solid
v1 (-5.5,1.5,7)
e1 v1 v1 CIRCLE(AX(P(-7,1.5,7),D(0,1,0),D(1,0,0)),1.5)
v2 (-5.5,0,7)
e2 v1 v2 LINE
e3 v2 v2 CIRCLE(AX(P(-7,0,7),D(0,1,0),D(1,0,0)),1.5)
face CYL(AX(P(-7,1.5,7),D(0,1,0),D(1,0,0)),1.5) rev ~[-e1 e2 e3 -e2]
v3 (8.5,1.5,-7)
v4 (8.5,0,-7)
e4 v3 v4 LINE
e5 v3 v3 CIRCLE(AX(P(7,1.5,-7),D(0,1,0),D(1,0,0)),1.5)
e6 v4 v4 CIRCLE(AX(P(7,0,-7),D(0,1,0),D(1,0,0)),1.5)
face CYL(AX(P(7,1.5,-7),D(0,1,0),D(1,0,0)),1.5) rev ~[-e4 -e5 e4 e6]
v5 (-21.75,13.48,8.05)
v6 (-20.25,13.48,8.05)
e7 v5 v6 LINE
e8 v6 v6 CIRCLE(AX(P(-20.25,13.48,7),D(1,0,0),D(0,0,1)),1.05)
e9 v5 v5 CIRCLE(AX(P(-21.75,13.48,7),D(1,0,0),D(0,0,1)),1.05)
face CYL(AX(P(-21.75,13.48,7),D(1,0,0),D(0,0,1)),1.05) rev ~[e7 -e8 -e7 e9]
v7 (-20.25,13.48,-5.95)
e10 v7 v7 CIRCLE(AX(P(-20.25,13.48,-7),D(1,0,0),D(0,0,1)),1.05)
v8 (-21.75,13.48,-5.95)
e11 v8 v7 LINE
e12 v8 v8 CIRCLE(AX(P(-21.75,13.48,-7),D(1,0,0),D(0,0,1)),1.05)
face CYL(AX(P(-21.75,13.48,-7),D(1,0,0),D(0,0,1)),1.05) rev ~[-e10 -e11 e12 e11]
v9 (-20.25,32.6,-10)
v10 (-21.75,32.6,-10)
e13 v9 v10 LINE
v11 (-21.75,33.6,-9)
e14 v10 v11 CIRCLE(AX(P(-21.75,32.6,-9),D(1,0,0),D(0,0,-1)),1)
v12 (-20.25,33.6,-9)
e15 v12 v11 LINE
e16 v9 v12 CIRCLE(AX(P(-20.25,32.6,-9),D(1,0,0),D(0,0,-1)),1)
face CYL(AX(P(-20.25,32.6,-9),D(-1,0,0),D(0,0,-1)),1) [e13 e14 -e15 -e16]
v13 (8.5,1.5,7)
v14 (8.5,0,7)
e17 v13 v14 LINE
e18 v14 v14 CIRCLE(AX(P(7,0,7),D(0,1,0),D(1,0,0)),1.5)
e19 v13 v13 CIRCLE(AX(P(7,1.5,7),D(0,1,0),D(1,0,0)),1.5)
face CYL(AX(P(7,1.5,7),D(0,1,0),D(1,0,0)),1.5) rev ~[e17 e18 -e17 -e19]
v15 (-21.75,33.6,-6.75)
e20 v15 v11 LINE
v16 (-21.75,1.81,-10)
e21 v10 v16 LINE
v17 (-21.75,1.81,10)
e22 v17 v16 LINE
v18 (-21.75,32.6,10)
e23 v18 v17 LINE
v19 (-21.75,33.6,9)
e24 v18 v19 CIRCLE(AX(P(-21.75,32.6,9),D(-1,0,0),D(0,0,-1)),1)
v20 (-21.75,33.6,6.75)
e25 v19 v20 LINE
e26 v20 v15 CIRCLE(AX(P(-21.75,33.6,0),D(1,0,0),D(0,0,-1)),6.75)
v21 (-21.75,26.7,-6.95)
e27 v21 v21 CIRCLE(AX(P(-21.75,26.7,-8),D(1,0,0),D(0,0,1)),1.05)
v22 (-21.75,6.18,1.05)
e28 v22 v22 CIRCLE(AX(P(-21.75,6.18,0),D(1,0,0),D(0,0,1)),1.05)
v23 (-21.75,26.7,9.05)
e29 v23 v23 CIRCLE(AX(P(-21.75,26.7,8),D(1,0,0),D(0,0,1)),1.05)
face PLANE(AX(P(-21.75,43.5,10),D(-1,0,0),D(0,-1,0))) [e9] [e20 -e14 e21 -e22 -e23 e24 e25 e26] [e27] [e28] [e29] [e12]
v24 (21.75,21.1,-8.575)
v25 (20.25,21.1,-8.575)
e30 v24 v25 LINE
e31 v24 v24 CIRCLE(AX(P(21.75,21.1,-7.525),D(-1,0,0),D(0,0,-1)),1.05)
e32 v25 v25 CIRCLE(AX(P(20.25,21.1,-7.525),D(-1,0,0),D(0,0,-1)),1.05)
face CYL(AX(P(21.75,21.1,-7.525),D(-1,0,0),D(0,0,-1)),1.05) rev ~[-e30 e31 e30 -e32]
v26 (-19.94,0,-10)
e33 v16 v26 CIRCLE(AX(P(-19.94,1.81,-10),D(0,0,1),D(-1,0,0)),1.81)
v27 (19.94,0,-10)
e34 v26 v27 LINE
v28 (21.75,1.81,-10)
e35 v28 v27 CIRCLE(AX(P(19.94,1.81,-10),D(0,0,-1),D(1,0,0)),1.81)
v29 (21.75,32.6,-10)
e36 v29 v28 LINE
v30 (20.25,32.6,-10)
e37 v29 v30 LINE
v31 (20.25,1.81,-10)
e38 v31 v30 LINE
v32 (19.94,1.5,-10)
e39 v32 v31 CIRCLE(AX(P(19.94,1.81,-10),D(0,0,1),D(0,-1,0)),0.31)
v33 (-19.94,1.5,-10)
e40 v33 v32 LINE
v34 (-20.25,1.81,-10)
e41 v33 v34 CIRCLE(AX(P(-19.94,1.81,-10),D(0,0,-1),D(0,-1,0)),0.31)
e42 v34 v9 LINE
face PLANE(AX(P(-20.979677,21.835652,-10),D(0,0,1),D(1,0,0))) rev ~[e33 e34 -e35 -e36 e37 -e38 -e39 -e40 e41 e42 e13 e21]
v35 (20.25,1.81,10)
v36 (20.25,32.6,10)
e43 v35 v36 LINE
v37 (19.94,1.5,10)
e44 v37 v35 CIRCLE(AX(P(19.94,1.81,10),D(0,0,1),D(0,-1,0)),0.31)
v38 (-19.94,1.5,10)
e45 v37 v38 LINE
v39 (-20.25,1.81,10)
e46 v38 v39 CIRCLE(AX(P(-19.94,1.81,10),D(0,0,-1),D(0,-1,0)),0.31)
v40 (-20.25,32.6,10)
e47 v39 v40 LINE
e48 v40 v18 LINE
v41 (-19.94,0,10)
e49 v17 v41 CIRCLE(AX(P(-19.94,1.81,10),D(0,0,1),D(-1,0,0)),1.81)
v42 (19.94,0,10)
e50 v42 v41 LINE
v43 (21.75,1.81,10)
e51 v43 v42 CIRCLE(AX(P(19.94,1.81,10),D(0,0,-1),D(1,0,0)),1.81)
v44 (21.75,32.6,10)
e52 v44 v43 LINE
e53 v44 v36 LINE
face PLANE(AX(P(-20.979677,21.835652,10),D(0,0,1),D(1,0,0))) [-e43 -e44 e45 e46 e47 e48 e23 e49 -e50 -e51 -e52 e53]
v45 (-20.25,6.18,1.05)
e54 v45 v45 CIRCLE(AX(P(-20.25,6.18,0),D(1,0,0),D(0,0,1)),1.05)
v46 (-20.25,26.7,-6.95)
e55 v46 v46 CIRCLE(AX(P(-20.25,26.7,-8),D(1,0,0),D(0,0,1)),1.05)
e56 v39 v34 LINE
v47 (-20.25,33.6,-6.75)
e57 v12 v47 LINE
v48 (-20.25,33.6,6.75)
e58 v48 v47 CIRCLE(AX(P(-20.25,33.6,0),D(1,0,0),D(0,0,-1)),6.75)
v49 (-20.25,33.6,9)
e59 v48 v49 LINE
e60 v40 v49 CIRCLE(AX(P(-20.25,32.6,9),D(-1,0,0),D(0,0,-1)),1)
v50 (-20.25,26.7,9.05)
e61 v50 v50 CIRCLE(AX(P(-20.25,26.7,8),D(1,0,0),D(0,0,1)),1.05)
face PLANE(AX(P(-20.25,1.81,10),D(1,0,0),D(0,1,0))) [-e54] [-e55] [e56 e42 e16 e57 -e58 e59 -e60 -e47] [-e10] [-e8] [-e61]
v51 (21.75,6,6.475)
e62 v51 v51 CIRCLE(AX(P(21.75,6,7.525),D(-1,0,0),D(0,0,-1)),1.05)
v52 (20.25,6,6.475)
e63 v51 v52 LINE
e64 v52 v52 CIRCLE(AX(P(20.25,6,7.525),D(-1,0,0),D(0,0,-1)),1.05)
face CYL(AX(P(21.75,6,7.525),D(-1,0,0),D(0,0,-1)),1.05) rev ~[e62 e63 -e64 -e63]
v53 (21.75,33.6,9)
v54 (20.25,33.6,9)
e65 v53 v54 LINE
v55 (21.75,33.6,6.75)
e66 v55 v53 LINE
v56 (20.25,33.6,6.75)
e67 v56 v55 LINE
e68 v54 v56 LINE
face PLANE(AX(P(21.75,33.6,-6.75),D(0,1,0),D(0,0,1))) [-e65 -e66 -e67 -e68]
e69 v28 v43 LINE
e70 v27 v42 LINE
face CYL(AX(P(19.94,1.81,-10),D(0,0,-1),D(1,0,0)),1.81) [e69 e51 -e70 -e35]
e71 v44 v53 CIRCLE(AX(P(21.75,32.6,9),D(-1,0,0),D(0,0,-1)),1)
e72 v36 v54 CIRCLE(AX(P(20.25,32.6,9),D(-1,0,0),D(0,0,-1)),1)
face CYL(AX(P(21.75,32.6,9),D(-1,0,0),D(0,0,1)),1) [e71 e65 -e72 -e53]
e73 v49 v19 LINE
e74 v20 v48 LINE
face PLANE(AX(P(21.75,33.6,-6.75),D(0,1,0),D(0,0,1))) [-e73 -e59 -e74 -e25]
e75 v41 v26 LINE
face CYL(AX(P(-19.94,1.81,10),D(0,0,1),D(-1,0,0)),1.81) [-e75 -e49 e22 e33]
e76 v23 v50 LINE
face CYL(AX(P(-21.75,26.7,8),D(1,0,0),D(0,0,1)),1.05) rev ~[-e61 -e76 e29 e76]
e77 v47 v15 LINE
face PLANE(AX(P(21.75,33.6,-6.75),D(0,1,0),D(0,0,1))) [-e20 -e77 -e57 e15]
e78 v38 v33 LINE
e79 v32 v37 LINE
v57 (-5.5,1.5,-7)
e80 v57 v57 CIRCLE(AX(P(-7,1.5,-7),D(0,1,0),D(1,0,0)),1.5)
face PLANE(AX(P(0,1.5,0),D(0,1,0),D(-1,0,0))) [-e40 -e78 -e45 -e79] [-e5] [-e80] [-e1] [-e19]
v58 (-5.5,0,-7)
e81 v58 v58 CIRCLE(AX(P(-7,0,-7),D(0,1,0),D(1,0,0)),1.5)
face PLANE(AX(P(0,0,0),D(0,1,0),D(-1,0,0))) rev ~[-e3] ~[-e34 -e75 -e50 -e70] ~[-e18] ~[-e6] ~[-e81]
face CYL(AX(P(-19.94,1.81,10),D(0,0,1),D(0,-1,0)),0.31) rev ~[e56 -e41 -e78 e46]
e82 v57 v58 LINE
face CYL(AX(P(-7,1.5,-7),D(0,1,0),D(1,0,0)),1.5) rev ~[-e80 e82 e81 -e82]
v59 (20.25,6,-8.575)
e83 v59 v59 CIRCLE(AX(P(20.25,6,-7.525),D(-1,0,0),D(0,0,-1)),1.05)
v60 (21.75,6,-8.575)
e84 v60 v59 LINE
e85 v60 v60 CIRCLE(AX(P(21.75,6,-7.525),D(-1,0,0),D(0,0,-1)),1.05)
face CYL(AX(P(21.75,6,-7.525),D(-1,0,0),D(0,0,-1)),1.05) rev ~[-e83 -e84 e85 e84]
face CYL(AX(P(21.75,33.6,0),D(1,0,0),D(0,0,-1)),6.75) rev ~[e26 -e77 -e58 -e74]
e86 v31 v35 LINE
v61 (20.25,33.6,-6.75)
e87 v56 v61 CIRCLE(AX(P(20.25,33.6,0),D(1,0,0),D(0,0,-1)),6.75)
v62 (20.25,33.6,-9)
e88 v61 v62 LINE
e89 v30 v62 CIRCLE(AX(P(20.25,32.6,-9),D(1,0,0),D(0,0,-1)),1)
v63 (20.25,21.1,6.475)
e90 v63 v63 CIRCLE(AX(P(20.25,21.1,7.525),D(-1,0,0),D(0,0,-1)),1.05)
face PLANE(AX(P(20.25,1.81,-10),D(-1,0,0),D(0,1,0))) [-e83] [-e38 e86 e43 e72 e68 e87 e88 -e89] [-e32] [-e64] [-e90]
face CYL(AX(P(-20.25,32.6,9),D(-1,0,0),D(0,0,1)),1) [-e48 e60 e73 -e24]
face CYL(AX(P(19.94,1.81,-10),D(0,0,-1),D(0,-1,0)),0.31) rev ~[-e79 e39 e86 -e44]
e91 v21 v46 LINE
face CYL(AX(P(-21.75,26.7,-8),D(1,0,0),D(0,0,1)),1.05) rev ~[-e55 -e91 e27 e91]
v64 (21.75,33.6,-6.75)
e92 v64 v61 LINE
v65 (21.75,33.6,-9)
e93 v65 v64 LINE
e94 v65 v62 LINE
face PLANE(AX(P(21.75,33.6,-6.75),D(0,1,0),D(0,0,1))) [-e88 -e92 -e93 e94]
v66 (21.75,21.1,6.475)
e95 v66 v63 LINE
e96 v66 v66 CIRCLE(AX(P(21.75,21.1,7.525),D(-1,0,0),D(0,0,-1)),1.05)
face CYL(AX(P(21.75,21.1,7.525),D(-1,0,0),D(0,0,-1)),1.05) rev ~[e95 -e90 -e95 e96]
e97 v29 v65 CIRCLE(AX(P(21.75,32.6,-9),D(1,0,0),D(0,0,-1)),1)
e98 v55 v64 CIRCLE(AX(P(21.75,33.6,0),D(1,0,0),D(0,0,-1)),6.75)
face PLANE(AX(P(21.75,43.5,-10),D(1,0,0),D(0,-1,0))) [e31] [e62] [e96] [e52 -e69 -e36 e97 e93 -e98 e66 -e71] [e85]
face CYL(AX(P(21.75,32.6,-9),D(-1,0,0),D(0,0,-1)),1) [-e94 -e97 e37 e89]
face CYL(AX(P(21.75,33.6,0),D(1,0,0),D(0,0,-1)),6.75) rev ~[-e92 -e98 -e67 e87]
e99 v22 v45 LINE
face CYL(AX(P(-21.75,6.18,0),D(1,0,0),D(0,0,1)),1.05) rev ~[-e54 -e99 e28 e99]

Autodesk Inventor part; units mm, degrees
ref_plane "YZ Plane" through (0, 0, 0) normal (1, 0, 0) x (0, 1, 0)
ref_plane "XZ Plane" through (0, 0, 0) normal (0, 1, 0) x (-1, 0, 0)
ref_plane "XY Plane" through (0, 0, 0) normal (0, 0, 1) x (1, 0, 0)
sketch "Sketch1" plane through (0, 0, 0) normal (0, 1, 0) x (-1, 0, 0)
  line L0 (20.25, -10) -> (-20.25, -10)
  line L1 (-20.25, -10) -> (-20.25, 10)
  line L2 (-20.25, 10) -> (20.25, 10)
  line L3 (20.25, 10) -> (20.25, -10)
  point P0 (0, 0)
  dimension "d0" = 40.5
  dimension "d1" = 20
  dimension "d2" = 10
  dimension "d3" = 20.25
extrude "Plate1" add sketch "Sketch1" along normal blind 1.5
sketch "Sketch2" plane through (21.75, 0, -10) normal (-1, 0, 0) x (0, -1, 0)
  line L0 (0, 20) -> (0, 0)
  line L1 (0, 0) -> (-43.5, 0)
  line L2 (-43.5, 0) -> (-43.5, 20)
  line L3 (-43.5, 20) -> (0, 20)
edge flange "Flange1" height 43.5 angle 90 thickness 1.5 bend radius 0.31 thickness toward (-1, 0, 0) relief tear relief width 1.5 relief depth 0.75 edges at (20.25, 1.5, 0) wall of the first edge with corners at (21.75, 0, 10) (21.75, 0, -10) (21.75, 43.5, -10) (21.75, 43.5, 10)
bend "Bend1"
corner "Corner1"
sketch "Sketch3" plane through (-21.75, 0, 10) normal (1, 0, 0) x (0, 1, 0)
  line L0 (0, -20) -> (0, 0)
  line L1 (0, 0) -> (43.5, 0)
  line L2 (43.5, 0) -> (43.5, -20)
  line L3 (43.5, -20) -> (0, -20)
edge flange "Flange2" height 43.5 angle 90 thickness 1.5 bend radius 0.31 thickness toward (1, 0, 0) relief tear relief width 1.5 relief depth 0.75 edges at (-20.25, 1.5, 0) wall of the first edge with corners at (-21.75, 0, -10) (-21.75, 0, 10) (-21.75, 43.5, 10) (-21.75, 43.5, -10)
bend "Bend2"
corner "Corner2"
sketch "Sketch4" plane through (21.75, 43.5, 10) normal (1, 0, 0) x (0, 0, -1)
  circle A0 centre (10, -9.9) radius 6.75
  line L0 (0, 0) -> (20, 0) projected
  line L1 (20, 0) -> (20, -41.69) projected
  point P0 (10, -43.5)
  dimension "d25" = 9.9
  dimension "d26" = 13.5
  dimension "d27" = 10
extrude "Extrusion1" cut sketch "Sketch4" against normal blind 50
sketch "Sketch5" plane through (21.75, 43.5, 10) normal (1, 0, 0) x (0, 0, -1)
  circle A0 centre (10, -9.9) radius 6.75 projected
  line L0 (0, 0) -> (20, 0) projected
  line L1 (-4, 0) -> (24, 0)
  line L2 (24, 0) -> (24, -9.9)
  line L3 (24, -9.9) -> (-4, -9.9)
  line L4 (-4, -9.9) -> (-4, 0)
  line L5 (0, -41.69) -> (0, 0) projected
  point P0 (10, -43.5)
  point P1 (20, 0)
  dimension "d30" = 9.9
  dimension "d31" = 28
  dimension "d32" = 4
extrude "Extrusion2" cut sketch "Sketch5" against normal blind 50 contours L3 A0 | A0 L3 L5 L0 L1 L2 | L3 L4 L1 L5 picked at (11.6841, -8.408)
fillet "Fillet1" radius 1 4 edges at (-21, 33.6, 10) (-21, 33.6, -10) (21, 33.6, -10) (21, 33.6, 10)
sketch "Sketch11" plane through (0, 1.5, 0) normal (0, 1, 0) x (1, 0, 0)
  circle A0 centre (7, 7) radius 1.5
  line L0 (-19.94, 10) -> (19.94, 10) projected
  line L1 (-19.94, 10) -> (-19.94, -10) projected
  circle A1 centre (-7, 7) radius 1.5
  circle A2 centre (7, -7) radius 1.5
  circle A3 centre (-7, -7) radius 1.5
  point P0 (0, 0)
  dimension "d71" = 7
  dimension "d72" = 3
  dimension "d73" = 7
  dimension "d76" = 14
  dimension "d79" = 14
extrude "Extrusion3" cut sketch "Sketch11" against normal through all
sketch "Sketch12" plane through (-21.75, 1.81, -10) normal (-1, 0, 0) x (0, 0, 1)
  circle A0 centre (18, 24.89) radius 0.7835
  circle A1 centre (10, 24.79) radius 0.7835
  circle A2 centre (17, 11.67) radius 0.7835
  circle A3 centre (3, 11.67) radius 0.7835
  circle A4 centre (10, 4.37) radius 0.7835
  circle A5 centre (2, 24.89) radius 0.7835
  point P0 (10, -1.81)
hole "Hole6" at (-21.75, 26.7, -8) at (-21.75, 26.7, 8) at (-21.75, 13.48, 7) at (-21.75, 6.18, 0) at (-21.75, 13.48, -7) direction (1, 0, 0) diameter 2.1 depth 1.5
sketch "Sketch13" plane through (21.75, 1.81, 10) normal (1, 0, 0) x (0, 0, -1)
  circle A0 centre (17.525, 4.19) radius 0.7835
  circle A1 centre (2.475, 4.19) radius 0.7835
  circle A2 centre (2.475, 19.29) radius 0.7835
  circle A3 centre (17.525, 19.29) radius 0.7835
  point P0 (10, -1.81)
hole "Hole7" at (21.75, 21.1, 7.525) at (21.75, 21.1, -7.525) at (21.75, 6, -7.525) at (21.75, 6, 7.525) direction (-1, 0, 0) diameter 2.1 depth 1.5
equation "\"d89\" = Thickness"
equation "\"d96\" = Thickness"
equation "\"d4\" = Thickness"
equation "\"d5\" = BendReliefWidth"
equation "\"d6\" = BendReliefDepth"
equation "\"d7\" = MinimumRemnant"
equation "\"d8\" = TransitionRadius"
equation "\"d11\" = BendRadius"
equation "\"d12\" = CornerReliefSize"
equation "\"d13\" = GapSize"
equation "\"d14\" = JacobiRadiusSize"
equation "\"d15\" = BendReliefWidth"
equation "\"d16\" = BendReliefDepth"
equation "\"d17\" = MinimumRemnant"
equation "\"d18\" = TransitionRadius"
equation "\"d21\" = BendRadius"
equation "\"d22\" = CornerReliefSize"
equation "\"d23\" = GapSize"
equation "\"d24\" = JacobiRadiusSize"
equation "\"BendReliefWidth\" = Thickness"
equation "\"BendReliefDepth\" = 0.5 * Thickness"
equation "\"CornerReliefSize\" = 4 * Thickness"
equation "\"MinimumRemnant\" = 2 * Thickness"
equation "\"TransitionRadius\" = BendRadius"
equation "\"JacobiRadiusSize\" = BendRadius"
equation "\"GapSize\" = Thickness"
equation "\"Thickness\" = 1.5"
equation "\"BendRadius\" = 0.31"
properties part number "axis_10_top_frame" material "Aluminum 6061-AHC"
